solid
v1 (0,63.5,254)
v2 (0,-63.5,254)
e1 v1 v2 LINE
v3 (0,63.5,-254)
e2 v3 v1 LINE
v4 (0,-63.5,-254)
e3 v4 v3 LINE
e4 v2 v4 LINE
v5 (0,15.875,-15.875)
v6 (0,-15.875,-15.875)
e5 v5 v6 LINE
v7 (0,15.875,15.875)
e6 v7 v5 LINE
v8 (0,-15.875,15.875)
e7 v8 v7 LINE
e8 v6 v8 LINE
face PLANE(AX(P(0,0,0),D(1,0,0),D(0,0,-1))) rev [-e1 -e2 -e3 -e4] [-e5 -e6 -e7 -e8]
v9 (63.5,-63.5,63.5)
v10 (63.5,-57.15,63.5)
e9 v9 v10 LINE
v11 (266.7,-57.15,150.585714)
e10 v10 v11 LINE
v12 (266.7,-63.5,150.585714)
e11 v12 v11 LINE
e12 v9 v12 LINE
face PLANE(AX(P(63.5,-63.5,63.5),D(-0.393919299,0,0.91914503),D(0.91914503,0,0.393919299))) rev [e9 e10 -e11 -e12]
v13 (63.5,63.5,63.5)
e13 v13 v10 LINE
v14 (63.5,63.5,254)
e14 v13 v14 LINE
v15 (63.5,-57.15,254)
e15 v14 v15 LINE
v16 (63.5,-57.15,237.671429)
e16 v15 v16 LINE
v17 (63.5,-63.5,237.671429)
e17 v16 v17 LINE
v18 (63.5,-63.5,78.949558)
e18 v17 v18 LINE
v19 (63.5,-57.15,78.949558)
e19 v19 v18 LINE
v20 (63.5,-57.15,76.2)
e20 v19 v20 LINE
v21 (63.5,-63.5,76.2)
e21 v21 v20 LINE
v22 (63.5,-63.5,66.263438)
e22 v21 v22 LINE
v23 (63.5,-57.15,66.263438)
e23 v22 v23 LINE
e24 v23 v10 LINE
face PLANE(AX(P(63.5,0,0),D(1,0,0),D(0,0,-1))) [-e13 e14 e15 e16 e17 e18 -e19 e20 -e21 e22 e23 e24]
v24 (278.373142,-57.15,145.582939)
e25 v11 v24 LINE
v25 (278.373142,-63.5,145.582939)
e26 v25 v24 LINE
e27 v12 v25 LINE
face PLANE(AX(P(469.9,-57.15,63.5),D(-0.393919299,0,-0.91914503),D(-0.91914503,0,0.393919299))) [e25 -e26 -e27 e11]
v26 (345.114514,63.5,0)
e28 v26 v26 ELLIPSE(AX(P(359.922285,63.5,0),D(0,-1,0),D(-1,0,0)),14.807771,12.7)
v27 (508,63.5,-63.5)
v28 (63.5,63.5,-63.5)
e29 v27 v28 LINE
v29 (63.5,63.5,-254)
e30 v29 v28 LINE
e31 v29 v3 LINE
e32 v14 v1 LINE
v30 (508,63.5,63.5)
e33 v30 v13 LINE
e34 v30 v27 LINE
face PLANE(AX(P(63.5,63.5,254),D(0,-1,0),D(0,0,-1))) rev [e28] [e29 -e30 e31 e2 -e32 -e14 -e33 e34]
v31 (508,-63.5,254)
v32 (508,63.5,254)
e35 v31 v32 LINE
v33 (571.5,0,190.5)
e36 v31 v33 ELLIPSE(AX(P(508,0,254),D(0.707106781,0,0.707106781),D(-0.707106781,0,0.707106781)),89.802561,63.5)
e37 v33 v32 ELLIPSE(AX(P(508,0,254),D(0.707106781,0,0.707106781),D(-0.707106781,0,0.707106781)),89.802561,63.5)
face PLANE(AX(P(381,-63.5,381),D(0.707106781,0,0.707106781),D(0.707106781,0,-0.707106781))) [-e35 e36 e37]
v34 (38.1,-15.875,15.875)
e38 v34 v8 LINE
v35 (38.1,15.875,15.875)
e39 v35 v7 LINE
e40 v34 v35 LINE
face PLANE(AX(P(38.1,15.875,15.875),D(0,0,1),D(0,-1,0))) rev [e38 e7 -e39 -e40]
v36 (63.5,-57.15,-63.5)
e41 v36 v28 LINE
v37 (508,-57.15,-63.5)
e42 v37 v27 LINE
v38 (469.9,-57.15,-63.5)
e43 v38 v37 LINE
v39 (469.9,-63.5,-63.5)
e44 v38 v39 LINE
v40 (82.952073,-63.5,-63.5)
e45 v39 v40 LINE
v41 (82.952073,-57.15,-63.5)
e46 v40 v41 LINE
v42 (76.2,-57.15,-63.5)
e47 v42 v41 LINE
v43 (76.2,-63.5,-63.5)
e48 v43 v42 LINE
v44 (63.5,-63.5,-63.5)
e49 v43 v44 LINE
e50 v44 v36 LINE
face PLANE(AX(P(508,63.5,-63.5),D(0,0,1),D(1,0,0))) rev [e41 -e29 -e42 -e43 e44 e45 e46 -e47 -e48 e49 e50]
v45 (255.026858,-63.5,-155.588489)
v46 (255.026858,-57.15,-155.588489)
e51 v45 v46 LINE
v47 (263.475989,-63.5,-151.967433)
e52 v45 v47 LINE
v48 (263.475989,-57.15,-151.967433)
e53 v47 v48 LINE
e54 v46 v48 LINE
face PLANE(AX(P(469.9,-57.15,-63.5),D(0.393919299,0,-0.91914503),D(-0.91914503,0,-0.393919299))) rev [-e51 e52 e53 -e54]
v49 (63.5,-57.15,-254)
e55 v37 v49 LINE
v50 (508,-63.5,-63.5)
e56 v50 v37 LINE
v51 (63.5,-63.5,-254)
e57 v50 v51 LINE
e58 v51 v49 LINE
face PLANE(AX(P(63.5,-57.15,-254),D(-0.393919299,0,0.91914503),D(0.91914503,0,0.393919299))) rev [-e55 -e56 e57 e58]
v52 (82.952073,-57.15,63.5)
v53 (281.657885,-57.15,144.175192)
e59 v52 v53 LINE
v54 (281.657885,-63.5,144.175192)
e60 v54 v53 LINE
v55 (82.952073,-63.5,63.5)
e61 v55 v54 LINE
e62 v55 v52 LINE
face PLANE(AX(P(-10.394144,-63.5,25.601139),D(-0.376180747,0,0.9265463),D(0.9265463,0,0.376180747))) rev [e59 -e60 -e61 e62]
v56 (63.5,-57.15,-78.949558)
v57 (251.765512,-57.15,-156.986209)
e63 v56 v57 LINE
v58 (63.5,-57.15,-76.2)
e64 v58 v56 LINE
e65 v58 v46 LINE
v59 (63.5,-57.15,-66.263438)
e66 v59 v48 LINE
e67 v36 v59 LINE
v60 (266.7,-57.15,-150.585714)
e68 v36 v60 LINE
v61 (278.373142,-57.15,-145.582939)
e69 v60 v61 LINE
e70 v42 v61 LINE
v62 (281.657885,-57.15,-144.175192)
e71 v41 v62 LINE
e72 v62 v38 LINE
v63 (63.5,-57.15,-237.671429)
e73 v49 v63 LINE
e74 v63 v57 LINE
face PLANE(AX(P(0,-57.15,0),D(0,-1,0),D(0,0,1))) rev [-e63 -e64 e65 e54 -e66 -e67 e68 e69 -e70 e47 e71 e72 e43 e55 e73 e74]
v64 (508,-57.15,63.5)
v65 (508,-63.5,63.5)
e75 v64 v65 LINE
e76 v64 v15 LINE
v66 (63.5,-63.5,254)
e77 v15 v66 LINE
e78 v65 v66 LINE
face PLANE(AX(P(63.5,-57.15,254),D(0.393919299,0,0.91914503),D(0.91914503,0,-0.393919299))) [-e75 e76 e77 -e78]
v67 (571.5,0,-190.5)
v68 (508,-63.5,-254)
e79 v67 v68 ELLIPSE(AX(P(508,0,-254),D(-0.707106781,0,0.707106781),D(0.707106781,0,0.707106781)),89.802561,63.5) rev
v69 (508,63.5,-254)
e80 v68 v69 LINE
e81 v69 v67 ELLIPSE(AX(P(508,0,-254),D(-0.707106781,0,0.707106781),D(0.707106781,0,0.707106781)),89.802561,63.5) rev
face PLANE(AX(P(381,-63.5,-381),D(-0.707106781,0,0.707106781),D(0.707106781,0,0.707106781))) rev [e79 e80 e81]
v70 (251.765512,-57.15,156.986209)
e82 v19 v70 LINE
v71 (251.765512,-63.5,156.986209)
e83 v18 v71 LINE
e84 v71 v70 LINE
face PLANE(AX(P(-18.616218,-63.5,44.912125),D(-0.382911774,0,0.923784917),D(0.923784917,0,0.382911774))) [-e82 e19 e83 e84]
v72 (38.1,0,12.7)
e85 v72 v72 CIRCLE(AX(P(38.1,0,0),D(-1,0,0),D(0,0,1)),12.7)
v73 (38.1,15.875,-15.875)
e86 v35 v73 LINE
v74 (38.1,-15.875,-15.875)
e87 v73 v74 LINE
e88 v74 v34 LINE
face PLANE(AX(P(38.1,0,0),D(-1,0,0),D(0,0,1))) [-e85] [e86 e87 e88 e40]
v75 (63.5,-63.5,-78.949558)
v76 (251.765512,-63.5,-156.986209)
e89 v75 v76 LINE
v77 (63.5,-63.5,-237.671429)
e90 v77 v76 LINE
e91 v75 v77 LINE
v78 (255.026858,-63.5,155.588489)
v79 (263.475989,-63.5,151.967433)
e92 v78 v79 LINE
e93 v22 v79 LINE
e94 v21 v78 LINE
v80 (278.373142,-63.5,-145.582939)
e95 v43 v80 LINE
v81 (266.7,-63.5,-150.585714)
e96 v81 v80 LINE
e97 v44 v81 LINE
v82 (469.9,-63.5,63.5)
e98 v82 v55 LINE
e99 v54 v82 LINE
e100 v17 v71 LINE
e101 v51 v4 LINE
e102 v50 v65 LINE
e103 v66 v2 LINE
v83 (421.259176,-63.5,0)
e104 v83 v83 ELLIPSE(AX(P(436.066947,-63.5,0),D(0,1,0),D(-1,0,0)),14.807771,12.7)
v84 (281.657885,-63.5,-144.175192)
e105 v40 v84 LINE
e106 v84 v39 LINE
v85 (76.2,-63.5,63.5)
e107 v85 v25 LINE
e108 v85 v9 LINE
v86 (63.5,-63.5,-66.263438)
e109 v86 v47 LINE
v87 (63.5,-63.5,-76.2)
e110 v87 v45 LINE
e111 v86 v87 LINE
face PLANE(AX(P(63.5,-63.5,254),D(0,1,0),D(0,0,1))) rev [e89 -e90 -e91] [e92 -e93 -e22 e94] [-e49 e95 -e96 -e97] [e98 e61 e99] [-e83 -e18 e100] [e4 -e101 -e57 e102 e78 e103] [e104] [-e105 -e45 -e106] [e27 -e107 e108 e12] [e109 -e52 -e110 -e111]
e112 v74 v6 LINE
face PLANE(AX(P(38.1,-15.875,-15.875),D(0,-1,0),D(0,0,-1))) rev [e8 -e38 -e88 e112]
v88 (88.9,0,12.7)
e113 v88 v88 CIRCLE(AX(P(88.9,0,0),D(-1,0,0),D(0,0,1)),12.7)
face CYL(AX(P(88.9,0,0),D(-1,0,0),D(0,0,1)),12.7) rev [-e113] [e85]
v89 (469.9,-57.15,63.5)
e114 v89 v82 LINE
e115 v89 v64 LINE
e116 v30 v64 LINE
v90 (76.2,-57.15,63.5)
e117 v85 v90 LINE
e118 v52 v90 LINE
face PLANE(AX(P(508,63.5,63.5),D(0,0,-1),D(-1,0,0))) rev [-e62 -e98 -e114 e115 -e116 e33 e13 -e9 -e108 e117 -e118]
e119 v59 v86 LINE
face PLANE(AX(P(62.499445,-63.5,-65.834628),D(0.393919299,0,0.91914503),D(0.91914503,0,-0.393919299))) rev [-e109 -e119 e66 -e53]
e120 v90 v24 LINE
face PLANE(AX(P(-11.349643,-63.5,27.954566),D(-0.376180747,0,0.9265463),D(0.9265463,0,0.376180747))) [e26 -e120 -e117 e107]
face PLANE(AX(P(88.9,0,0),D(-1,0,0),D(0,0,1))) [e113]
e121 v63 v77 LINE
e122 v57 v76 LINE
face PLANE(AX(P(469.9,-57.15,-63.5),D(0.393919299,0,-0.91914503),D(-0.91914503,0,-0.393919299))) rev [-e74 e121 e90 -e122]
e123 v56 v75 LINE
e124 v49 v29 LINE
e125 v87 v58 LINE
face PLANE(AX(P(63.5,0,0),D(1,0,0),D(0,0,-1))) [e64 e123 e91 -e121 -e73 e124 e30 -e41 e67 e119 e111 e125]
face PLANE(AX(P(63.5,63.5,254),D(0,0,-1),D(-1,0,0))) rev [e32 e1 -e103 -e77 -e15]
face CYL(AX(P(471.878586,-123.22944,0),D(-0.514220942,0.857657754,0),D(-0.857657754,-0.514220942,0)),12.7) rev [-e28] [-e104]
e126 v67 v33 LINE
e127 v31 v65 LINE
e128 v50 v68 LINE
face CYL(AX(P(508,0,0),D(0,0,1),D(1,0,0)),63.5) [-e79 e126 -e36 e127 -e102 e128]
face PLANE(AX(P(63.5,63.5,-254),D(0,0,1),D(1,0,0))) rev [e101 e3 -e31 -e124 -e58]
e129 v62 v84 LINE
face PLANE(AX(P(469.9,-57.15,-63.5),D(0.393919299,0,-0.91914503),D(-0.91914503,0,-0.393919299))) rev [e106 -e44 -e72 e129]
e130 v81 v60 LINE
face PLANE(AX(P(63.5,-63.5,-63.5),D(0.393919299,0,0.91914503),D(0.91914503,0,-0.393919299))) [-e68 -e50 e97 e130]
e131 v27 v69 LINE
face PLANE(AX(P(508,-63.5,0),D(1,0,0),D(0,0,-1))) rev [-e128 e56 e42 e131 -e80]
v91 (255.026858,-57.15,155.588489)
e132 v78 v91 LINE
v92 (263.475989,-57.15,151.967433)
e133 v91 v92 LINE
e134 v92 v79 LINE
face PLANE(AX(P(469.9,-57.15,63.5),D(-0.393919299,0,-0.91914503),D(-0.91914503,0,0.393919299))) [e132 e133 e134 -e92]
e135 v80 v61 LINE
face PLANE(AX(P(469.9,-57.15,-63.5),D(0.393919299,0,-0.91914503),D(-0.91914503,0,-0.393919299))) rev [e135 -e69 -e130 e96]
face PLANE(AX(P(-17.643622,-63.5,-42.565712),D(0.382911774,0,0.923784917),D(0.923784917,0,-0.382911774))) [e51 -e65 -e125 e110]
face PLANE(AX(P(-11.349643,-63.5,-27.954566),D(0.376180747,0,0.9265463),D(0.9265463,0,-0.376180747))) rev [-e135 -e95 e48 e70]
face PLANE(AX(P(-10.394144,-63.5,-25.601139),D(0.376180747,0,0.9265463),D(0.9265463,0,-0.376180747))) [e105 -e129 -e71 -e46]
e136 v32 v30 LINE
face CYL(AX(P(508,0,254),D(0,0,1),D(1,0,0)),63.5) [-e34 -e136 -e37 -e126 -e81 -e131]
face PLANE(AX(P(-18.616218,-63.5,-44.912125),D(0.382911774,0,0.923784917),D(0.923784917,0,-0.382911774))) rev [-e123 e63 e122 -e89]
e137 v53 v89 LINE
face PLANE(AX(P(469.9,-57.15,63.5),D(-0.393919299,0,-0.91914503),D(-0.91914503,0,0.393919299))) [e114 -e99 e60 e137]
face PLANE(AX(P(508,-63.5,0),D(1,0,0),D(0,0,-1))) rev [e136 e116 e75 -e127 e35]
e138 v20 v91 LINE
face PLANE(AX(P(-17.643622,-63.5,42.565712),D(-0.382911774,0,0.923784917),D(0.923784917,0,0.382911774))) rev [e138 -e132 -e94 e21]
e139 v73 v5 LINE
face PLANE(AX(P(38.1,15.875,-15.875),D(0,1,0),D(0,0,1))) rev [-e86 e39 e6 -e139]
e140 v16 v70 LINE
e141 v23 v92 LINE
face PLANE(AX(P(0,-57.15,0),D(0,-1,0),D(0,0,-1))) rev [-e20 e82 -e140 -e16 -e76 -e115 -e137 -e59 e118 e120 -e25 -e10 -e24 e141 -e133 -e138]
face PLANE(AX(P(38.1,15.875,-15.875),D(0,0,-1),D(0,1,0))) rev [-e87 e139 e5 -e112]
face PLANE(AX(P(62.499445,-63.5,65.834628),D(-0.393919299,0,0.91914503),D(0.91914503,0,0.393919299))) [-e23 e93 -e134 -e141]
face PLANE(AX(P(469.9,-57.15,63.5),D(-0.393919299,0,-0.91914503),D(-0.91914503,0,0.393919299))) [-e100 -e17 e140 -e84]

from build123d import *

# Parameters (mm, degrees)
SKETCH2_W               = 508
SKETCH2_H               = 127
BOSS_EXTRUDE1_DEPTH     = 63.5
SKETCH3_W               = 127
SKETCH3_H               = 127
BOSS_EXTRUDE2_DEPTH     = 444.5
SKETCH4_W               = 31.75
SKETCH4_H               = 31.75
CUT_EXTRUDE1_DEPTH      = 38.1
SKETCH5_R               = 12.7
CUT_EXTRUDE2_DEPTH      = 50.8
BOSS_EXTRUDE3_DEPTH     = 6.35
EXTRUDE_THIN1_START     = -6.35
EXTRUDE_THIN1_DEPTH     = 6.35
BOSS_EXTRUDE4_DEPTH     = 127
FILLET1_R               = 63.5
CUT_EXTRUDE3_DEPTH      = 583.156936495
CUT_EXTRUDE3_DEPTH_BACK = 583.156936495
SKETCH13_R              = 12.7


# Read off the part's stored shape, not the designer's step: Extrude-Thin1
with BuildPart() as part:
    # Sketch2 → Boss-Extrude1 (new body)
    with BuildSketch(Plane(origin=(0, 0, 0), x_dir=(0, 0, -1), z_dir=(1, 0, 0))):
        Rectangle(SKETCH2_W, SKETCH2_H)
    extrude(amount=BOSS_EXTRUDE1_DEPTH)

    # Sketch3 → Boss-Extrude2 (add)
    with BuildSketch(Plane(origin=(63.5, 0, 0), x_dir=(0, 0, -1), z_dir=(1, 0, 0))):
        Rectangle(SKETCH3_W, SKETCH3_H)
    extrude(amount=BOSS_EXTRUDE2_DEPTH)

    # Sketch4 → Cut-Extrude1 (cut)
    with BuildSketch(Plane.ZY):
        Rectangle(SKETCH4_W, SKETCH4_H)
    extrude(amount=-CUT_EXTRUDE1_DEPTH, mode=Mode.SUBTRACT)

    # Sketch5 → Cut-Extrude2 (cut)
    with BuildSketch(Plane.ZY.offset(-38.1)):
        Circle(SKETCH5_R)
    extrude(amount=-CUT_EXTRUDE2_DEPTH, mode=Mode.SUBTRACT)

    # Sketch10 → Boss-Extrude3 (add)
    with BuildSketch(Plane.XZ.offset(63.5)):
        Polygon((63.5, 254), (508, 63.5), (469.9, 63.5), (63.5, 237.671428571), align=None)
    boss_extrude3 = extrude(amount=-BOSS_EXTRUDE3_DEPTH)

    # Mirror1: Boss-Extrude3 across plane
    add(boss_extrude3.mirror(Plane.XY))

    # Extrude-Thin1 outline → Extrude-Thin1 (add)
    with BuildSketch(Plane(origin=(0, -57.15, 0), x_dir=(1, 0, 0), z_dir=(0, 1, 0)).offset(EXTRUDE_THIN1_START)):
        Polygon((82.952073355, -63.5), (76.2, -63.5), (278.373141881, -145.582939194), (281.657885075, -144.175192111), align=None)
        Polygon((266.7, -150.585714286), (63.5, -63.5), (63.5, -66.26343767), (263.475989385, -151.967433121), align=None)
        Polygon((255.026858119, -155.588489378), (63.5, -76.2), (63.5, -78.949557774), (251.765512342, -156.986208996), align=None)
    extrude_thin1 = extrude(amount=EXTRUDE_THIN1_DEPTH)

    # Mirror2: Extrude-Thin1 across plane
    add(extrude_thin1.mirror(Plane.XY))

    # Sketch12 → Boss-Extrude4 (add)
    with BuildSketch(Plane(origin=(0, 63.5, 0), x_dir=(1, 0, 0), z_dir=(0, 1, 0))):
        Polygon((508, 254), (508, 63.5), (571.5, 63.5), (571.5, 190.5), align=None)
        Polygon((571.5, 63.5), (508, 63.5), (508, -63.5), (508, -254), (571.5, -190.5), align=None)
    extrude(amount=-BOSS_EXTRUDE4_DEPTH)

    # Fillet1
    fillet1_edges = [part.edges().sort_by_distance(p)[0] for p in [
        (571.5, -63.5, 0),
        (571.5, 63.5, 0),
    ]]
    fillet(fillet1_edges, radius=FILLET1_R - 0.0001)  # a hair under: the kernel refuses the full size

    # Sketch13 → Cut-Extrude3 (cut, two sides: drawn at the far end of the back side and taken through both)
    with BuildSketch(Plane(origin=(106.321850008, -177.331865581, 0), x_dir=(0, 0, -1), z_dir=(-0.5142209424211187, 0.857657753638091, 0)).offset(-CUT_EXTRUDE3_DEPTH_BACK)):
        with Locations(Location((0, -341.343168692, 0), (0, 0, 90))):
            Circle(SKETCH13_R)
    extrude(amount=CUT_EXTRUDE3_DEPTH + CUT_EXTRUDE3_DEPTH_BACK, mode=Mode.SUBTRACT)


solid = part.part
